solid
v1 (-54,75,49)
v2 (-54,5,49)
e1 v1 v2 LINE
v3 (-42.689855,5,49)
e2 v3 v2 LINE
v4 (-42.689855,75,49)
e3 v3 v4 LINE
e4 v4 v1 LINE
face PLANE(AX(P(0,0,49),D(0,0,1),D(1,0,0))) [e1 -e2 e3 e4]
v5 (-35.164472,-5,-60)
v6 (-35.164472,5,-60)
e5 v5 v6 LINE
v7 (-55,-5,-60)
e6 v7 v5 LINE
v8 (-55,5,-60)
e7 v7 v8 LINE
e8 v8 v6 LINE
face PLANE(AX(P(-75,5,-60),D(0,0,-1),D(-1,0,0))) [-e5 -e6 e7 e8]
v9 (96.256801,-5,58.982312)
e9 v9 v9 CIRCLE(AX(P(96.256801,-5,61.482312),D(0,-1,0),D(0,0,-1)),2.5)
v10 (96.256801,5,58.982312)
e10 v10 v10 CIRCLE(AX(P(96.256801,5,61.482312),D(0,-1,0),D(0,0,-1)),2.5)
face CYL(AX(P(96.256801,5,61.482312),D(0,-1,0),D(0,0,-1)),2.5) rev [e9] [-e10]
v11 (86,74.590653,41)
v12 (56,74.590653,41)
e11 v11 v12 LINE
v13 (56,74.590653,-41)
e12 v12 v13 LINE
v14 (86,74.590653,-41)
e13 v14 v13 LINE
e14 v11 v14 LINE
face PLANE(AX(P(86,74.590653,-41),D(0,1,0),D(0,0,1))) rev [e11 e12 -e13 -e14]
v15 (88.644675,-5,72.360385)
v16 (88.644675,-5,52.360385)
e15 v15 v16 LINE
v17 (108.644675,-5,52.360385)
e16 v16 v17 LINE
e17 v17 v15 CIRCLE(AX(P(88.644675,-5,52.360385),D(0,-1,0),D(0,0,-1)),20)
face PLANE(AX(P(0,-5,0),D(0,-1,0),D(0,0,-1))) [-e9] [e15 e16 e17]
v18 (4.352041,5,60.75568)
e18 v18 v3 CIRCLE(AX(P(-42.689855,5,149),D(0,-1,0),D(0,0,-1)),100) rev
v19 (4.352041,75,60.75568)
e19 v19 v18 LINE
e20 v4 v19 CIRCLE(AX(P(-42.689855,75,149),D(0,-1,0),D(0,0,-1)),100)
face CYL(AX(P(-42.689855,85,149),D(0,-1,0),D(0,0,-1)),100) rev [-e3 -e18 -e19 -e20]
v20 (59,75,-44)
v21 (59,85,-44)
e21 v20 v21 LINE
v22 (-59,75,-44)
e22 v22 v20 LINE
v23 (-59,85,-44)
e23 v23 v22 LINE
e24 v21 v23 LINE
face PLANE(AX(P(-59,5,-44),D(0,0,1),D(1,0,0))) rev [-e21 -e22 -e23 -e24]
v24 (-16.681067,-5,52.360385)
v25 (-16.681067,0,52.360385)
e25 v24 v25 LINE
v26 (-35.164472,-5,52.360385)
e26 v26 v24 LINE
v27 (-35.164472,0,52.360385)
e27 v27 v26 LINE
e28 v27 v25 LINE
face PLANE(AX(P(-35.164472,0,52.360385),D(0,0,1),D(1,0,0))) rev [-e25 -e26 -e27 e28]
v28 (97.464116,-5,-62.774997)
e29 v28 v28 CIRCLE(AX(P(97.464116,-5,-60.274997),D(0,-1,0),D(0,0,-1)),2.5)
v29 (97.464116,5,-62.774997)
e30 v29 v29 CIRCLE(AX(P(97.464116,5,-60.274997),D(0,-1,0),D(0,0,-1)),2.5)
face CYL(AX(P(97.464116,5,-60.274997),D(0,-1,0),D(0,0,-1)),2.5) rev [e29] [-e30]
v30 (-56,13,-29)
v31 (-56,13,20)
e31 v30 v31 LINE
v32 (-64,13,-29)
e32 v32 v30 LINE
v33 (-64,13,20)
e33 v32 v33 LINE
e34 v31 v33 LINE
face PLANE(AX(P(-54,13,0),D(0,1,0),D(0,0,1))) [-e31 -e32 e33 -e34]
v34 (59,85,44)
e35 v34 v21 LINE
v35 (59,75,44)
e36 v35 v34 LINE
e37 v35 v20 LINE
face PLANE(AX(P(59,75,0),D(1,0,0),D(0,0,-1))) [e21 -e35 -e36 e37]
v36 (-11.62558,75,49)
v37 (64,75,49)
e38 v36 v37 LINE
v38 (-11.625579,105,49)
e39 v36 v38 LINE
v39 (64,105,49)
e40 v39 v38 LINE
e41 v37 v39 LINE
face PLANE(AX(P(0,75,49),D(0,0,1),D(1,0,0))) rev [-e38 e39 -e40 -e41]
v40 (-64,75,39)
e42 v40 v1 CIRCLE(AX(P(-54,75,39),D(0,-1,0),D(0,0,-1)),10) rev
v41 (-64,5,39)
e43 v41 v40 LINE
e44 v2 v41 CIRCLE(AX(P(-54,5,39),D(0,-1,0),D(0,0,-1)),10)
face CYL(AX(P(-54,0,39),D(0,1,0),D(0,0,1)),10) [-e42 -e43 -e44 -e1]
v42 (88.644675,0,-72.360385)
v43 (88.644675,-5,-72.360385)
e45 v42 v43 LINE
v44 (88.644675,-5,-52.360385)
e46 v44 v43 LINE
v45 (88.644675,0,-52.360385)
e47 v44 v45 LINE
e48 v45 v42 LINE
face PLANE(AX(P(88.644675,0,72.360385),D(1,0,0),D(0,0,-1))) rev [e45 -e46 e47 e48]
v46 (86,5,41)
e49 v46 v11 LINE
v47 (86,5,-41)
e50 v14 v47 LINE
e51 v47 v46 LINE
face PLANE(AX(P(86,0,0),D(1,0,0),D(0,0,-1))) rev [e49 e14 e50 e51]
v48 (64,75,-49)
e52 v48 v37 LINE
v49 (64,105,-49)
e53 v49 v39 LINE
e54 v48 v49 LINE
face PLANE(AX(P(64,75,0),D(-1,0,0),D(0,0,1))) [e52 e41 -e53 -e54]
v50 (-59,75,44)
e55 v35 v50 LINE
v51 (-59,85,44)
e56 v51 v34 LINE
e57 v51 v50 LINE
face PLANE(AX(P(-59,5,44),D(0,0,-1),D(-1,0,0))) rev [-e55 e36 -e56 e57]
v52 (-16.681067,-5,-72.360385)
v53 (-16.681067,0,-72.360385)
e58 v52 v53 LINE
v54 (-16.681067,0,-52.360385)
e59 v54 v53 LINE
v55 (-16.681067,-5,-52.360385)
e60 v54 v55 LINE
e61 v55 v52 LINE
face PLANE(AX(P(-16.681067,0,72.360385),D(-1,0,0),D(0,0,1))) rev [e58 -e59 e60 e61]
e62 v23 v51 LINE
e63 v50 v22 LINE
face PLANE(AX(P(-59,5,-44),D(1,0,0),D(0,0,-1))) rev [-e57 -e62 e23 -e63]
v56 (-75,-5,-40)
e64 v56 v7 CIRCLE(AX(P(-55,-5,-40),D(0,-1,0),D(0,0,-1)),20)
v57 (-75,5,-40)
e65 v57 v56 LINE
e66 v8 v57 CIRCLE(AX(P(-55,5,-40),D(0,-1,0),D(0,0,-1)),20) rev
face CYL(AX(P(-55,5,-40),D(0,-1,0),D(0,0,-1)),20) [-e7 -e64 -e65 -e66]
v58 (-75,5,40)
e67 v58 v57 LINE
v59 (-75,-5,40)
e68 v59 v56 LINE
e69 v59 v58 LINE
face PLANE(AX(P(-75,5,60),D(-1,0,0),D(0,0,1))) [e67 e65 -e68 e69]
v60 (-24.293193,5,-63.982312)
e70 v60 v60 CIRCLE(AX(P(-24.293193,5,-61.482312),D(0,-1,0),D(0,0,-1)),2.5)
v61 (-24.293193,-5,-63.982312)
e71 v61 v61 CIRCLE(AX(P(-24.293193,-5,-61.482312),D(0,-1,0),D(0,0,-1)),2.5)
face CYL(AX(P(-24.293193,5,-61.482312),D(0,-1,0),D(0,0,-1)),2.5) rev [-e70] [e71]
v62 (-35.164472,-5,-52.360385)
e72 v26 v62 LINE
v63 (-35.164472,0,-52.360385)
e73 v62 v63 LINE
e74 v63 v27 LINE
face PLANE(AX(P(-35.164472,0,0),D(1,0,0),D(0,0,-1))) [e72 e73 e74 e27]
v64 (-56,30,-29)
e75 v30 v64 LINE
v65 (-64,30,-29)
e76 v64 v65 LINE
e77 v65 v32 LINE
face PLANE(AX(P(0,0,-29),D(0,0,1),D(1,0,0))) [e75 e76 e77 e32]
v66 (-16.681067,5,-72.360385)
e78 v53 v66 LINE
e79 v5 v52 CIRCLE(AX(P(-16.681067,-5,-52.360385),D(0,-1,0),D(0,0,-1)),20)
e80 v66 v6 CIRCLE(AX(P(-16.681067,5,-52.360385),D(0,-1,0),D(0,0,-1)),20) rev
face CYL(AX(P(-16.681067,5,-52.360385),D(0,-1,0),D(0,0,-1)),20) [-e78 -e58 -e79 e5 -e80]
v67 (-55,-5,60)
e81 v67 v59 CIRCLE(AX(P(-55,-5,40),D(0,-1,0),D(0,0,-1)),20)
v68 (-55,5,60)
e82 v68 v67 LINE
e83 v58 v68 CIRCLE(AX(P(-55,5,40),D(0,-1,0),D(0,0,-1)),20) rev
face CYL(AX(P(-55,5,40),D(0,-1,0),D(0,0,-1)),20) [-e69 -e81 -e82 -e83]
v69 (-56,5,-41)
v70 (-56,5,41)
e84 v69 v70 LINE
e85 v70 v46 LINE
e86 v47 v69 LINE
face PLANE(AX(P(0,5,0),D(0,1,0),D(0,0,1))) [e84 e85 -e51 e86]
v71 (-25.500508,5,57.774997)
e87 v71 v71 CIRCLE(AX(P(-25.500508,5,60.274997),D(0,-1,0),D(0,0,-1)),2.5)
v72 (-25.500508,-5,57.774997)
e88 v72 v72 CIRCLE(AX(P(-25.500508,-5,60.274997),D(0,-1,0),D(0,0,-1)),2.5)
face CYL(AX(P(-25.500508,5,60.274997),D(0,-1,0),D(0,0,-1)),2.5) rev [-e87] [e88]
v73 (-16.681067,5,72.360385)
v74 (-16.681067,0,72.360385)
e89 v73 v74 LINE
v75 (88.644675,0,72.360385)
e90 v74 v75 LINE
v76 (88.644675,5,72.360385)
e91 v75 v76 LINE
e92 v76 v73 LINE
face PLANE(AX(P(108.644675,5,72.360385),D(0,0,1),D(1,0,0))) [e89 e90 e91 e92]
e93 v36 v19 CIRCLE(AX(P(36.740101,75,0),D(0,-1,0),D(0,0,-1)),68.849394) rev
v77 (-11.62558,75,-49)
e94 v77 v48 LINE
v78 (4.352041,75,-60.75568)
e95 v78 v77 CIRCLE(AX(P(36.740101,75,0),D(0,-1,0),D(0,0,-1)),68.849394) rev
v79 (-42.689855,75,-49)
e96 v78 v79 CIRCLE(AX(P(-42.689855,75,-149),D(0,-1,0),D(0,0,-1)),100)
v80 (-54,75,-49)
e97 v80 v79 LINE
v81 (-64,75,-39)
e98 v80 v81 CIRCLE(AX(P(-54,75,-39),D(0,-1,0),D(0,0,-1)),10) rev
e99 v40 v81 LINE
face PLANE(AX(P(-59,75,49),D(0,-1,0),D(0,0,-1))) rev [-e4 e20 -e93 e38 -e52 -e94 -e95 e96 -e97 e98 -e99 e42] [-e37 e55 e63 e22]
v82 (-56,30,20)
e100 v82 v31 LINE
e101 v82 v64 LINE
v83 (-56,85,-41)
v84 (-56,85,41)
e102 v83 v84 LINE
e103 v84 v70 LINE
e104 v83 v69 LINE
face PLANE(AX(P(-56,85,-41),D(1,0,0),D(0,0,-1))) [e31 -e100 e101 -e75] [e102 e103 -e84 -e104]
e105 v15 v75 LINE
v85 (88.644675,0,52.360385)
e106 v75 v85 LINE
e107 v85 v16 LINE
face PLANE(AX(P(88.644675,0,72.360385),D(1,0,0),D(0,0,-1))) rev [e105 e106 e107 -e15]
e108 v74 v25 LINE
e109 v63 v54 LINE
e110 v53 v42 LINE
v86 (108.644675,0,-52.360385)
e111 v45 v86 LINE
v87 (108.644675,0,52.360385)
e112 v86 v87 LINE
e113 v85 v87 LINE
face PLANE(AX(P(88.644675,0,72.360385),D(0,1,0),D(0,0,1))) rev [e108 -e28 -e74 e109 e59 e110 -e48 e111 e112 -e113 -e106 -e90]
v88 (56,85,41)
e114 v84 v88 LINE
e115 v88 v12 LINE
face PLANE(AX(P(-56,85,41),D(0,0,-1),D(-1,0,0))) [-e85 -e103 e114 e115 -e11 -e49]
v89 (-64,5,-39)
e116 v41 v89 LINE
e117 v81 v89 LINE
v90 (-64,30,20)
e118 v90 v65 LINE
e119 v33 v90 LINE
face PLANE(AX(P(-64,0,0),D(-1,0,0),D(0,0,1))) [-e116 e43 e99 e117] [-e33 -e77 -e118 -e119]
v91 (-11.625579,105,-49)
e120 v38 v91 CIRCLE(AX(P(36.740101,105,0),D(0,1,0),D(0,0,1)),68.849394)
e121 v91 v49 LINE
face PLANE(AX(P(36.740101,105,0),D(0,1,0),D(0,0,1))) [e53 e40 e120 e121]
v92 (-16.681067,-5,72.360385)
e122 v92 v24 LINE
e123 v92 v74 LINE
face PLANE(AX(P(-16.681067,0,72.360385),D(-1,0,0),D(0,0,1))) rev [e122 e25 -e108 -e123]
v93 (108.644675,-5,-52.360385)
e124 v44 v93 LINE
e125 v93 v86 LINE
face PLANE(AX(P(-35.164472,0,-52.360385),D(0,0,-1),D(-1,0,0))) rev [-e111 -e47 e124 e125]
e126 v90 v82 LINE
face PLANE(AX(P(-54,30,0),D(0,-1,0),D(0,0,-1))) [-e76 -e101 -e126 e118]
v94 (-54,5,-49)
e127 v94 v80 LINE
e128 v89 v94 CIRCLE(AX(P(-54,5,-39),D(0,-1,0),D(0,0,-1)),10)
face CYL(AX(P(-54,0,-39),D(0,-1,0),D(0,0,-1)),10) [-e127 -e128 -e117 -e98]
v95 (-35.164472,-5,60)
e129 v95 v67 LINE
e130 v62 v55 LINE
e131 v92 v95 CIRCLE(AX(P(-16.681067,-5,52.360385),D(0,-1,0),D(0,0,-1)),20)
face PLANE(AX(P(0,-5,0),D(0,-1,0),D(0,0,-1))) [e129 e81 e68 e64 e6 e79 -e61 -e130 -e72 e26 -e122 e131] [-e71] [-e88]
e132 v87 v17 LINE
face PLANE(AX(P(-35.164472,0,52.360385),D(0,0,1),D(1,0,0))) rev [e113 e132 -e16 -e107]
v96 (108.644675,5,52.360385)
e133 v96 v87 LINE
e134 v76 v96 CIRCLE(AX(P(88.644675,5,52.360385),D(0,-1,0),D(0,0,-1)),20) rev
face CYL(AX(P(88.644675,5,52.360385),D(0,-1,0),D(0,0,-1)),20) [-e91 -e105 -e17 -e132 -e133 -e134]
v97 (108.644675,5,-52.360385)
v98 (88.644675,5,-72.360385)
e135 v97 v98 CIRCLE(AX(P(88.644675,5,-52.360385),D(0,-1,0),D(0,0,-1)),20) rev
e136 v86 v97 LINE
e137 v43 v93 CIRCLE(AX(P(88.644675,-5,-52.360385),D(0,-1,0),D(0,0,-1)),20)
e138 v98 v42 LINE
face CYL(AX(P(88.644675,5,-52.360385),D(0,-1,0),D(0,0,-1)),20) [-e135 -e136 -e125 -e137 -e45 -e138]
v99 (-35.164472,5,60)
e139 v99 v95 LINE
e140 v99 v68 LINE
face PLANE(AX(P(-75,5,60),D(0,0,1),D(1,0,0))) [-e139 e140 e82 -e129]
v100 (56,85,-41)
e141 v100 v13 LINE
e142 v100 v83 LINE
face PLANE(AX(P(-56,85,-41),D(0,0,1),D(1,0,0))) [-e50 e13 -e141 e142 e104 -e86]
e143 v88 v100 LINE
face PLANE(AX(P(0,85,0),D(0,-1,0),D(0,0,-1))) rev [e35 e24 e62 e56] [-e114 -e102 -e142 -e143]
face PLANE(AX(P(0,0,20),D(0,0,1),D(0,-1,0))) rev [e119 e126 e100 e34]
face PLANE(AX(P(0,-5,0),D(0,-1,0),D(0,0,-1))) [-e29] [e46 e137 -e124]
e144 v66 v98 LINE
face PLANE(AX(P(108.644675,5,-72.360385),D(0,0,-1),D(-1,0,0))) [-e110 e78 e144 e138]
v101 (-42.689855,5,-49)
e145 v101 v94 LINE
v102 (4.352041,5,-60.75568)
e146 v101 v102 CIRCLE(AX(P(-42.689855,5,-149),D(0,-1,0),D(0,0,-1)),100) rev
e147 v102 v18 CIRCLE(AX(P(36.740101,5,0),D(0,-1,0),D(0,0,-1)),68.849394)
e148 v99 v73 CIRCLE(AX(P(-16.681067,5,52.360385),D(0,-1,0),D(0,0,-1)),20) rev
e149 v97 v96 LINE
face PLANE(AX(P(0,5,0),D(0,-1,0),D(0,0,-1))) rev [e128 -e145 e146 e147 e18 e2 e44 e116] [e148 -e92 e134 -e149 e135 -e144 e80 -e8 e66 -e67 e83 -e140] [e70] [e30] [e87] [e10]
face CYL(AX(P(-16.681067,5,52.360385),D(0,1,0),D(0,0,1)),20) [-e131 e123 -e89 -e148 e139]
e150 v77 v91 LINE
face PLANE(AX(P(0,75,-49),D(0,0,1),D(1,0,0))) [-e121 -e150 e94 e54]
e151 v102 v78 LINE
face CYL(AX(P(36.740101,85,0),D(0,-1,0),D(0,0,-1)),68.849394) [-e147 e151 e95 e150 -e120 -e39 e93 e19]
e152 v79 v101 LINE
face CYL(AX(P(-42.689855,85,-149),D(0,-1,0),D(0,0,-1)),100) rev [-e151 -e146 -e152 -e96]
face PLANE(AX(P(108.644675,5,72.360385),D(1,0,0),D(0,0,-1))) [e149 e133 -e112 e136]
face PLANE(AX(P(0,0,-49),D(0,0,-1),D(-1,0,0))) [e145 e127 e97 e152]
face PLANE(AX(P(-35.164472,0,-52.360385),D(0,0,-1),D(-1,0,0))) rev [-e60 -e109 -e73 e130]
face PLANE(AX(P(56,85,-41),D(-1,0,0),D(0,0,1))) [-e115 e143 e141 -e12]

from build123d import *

# Parameters (mm, degrees)
CROQUIS2_W               = 118
CROQUIS2_H               = 88
SALIENTE_EXTRUIR1_DEPTH  = 5
CROQUIS3_W               = 118
CROQUIS3_H               = 88
CROQUIS3_W_2             = 112
CROQUIS3_H_2             = 82
SALIENTE_EXTRUIR2_DEPTH  = 80
CROQUIS4_W               = 150
CROQUIS4_H               = 120
SALIENTE_EXTRUIR3_DEPTH  = 5
CROQUIS7_W               = 60
CROQUIS7_H               = 17
CORTAR_EXTRUIR3_DEPTH    = 5
CROQUIS8_W               = 3
CROQUIS8_H               = 17
SALIENTE_EXTRUIR4_DEPTH  = 4
CROQUIS9_W               = 3
CROQUIS9_H               = 17
SALIENTE_EXTRUIR5_DEPTH  = 7
CROQUIS10_W              = 118
CROQUIS10_H              = 5
SALIENTE_EXTRUIR6_DEPTH  = 5
CROQUIS11_W              = 93
CROQUIS11_H              = 5
SALIENTE_EXTRUIR7_DEPTH  = 5
CROQUIS12_W              = 123
CROQUIS12_H              = 5
SALIENTE_EXTRUIR8_DEPTH  = 5
CROQUIS13_W              = 98
CROQUIS13_H              = 5
SALIENTE_EXTRUIR9_DEPTH  = 5
SALIENTE_EXTRUIR11_DEPTH = 85
CORTAR_EXTRUIR4_DEPTH    = 10
SALIENTE_EXTRUIR12_DEPTH = 70
CROQUIS21_W              = 49
CROQUIS21_H              = 17
CORTAR_EXTRUIR5_DEPTH    = 70
REDONDEO4_R              = 10
REDONDEO5_R              = 100
SALIENTE_EXTRUIR13_DEPTH = 20
CROQUIS23_W              = 143.80914693
CROQUIS23_H              = 144.72077086
CROQUIS23_R              = 24.004265162
SALIENTE_EXTRUIR14_DEPTH = 5
SALIENTE_EXTRUIR15_DEPTH = 5
REDONDEO9_R              = 20
CROQUIS27_W              = 105.325741151
CROQUIS27_H              = 5
CORTAR_EXTRUIR7_DEPTH    = 210.21942266
CROQUIS28_W              = 104.72077086
CROQUIS28_H              = 5
CORTAR_EXTRUIR8_DEPTH    = 143.809145
CROQUIS29_R              = 2.5
CORTAR_EXTRUIR9_DEPTH    = 10
REDONDEO10_R             = 20
CROQUIS30_W              = 82
CROQUIS30_H              = 69.590652645
CORTAR_EXTRUIR10_DEPTH   = 30


with BuildPart() as part:
    # Croquis2 → Saliente-Extruir1 (new body)
    with BuildSketch(Plane(origin=(0, 0, 0), x_dir=(1, 0, 0), z_dir=(0, 1, 0))):
        Rectangle(CROQUIS2_W, CROQUIS2_H)
    extrude(amount=SALIENTE_EXTRUIR1_DEPTH)

    # Croquis3 → Saliente-Extruir2 (add)
    with BuildSketch(Plane(origin=(0, 5, 0), x_dir=(1, 0, 0), z_dir=(0, 1, 0))):
        Rectangle(CROQUIS3_W, CROQUIS3_H)
        Rectangle(CROQUIS3_W_2, CROQUIS3_H_2, mode=Mode.SUBTRACT)
    extrude(amount=SALIENTE_EXTRUIR2_DEPTH)

    # Croquis4 → Saliente-Extruir3 (add)
    with BuildSketch(Plane.XZ):
        Rectangle(CROQUIS4_W, CROQUIS4_H)
    extrude(amount=-SALIENTE_EXTRUIR3_DEPTH)

    # Croquis7 → Cortar-Extruir3 (cut)
    with BuildSketch(Plane.ZY.offset(59)):
        with Locations((-3, 21.5)):
            Rectangle(CROQUIS7_W, CROQUIS7_H)
    extrude(amount=-CORTAR_EXTRUIR3_DEPTH, mode=Mode.SUBTRACT)

    # Croquis8 → Saliente-Extruir4 (add)
    with BuildSketch(Plane.XY.offset(-33)):
        with Locations((-57.5, 21.5)):
            Rectangle(CROQUIS8_W, CROQUIS8_H)
    extrude(amount=SALIENTE_EXTRUIR4_DEPTH)

    # Croquis9 → Saliente-Extruir5 (add)
    with BuildSketch(Plane(origin=(0, 0, 27), x_dir=(-1, 0, 0), z_dir=(0, 0, -1))):
        with Locations((57.5, 21.5)):
            Rectangle(CROQUIS9_W, CROQUIS9_H)
    extrude(amount=SALIENTE_EXTRUIR5_DEPTH)

    # Croquis10 → Saliente-Extruir6 (add)
    with BuildSketch(Plane.XY.offset(44)):
        with Locations((0, 72.5)):
            Rectangle(CROQUIS10_W, CROQUIS10_H)
    extrude(amount=SALIENTE_EXTRUIR6_DEPTH)

    # Croquis11 → Saliente-Extruir7 (add)
    with BuildSketch(Plane(origin=(59, 0, 0), x_dir=(0, 0, -1), z_dir=(1, 0, 0))):
        with Locations((-2.5, 72.5)):
            Rectangle(CROQUIS11_W, CROQUIS11_H)
    extrude(amount=SALIENTE_EXTRUIR7_DEPTH)

    # Croquis12 → Saliente-Extruir8 (add)
    with BuildSketch(Plane(origin=(0, 0, -44), x_dir=(-1, 0, 0), z_dir=(0, 0, -1))):
        with Locations((-2.5, 72.5)):
            Rectangle(CROQUIS12_W, CROQUIS12_H)
    extrude(amount=SALIENTE_EXTRUIR8_DEPTH)

    # Croquis13 → Saliente-Extruir9 (add)
    with BuildSketch(Plane.ZY.offset(59)):
        with Locations((0, 72.5)):
            Rectangle(CROQUIS13_W, CROQUIS13_H)
    extrude(amount=SALIENTE_EXTRUIR9_DEPTH)

    # Croquis16 → Saliente-Extruir11 (add)
    with BuildSketch(Plane(origin=(0, 0, 0), x_dir=(-1, 0, 0), z_dir=(0, -1, 0))):
        with BuildLine():
            Line((-59, 44), (16.214965512, 44))
            ThreePointArc((16.214965512, 44), (-105.589495195, 0), (16.214965512, -44))
            Line((16.214965512, -44), (-59, -44))
            Line((-59, -44), (-59, 44))
        make_face()
    extrude(amount=-SALIENTE_EXTRUIR11_DEPTH)

    # Croquis18 → Cortar-Extruir4 (cut)
    with BuildSketch(Plane(origin=(0, 85, 0), x_dir=(1, 0, 0), z_dir=(0, 1, 0))):
        Polygon((-64, 49), (-8.415102712, 49), (63.361111922, 49), (64, 49), (64, 44), (64, -44), (64, -49), (63.361111922, -49), (-8.415102712, -49), (-64, -49), (-64, -44), (-16.214965512, -44), (59, -44), (59, 44), (-16.214965512, 44), (-64, 44), align=None)
    extrude(amount=-CORTAR_EXTRUIR4_DEPTH, mode=Mode.SUBTRACT)

    # Croquis19 → Saliente-Extruir12 (add)
    with BuildSketch(Plane(origin=(0, 5, 0), x_dir=(1, 0, 0), z_dir=(0, 1, 0))):
        Polygon((-16.214965512, -44), (-59, -44), (-59, 44), (-16.214965512, 44), (3.50341587, 44), (3.50341587, 49), (-8.415102712, 49), (-64, 49), (-64, -49), (-8.415102712, -49), (4.243498443, -49), (4.243498443, -44), align=None)
    extrude(amount=SALIENTE_EXTRUIR12_DEPTH)

    # Croquis21 → Cortar-Extruir5 (cut)
    with BuildSketch(Plane(origin=(-56, 0, 0), x_dir=(0, 0, -1), z_dir=(1, 0, 0))):
        with Locations((4.5, 21.5)):
            Rectangle(CROQUIS21_W, CROQUIS21_H)
    extrude(amount=-CORTAR_EXTRUIR5_DEPTH, mode=Mode.SUBTRACT)

    # Redondeo4
    redondeo4_edges = [part.edges().sort_by_distance(p)[0] for p in [
        (-64, 40, -49),
        (-64, 40, 49),
    ]]
    fillet(redondeo4_edges, radius=REDONDEO4_R)

    # Redondeo5
    redondeo5_edges = [part.edges().sort_by_distance(p)[0] for p in [
        (-11.625579702, 40, -49),
        (-11.625579702, 40, 49),
    ]]
    fillet(redondeo5_edges, radius=REDONDEO5_R)

    # Croquis22 → Saliente-Extruir13 (add)
    with BuildSketch(Plane(origin=(0, 85, 0), x_dir=(1, 0, 0), z_dir=(0, 1, 0))):
        with BuildLine():
            Line((64, -49), (4.315842741, -49))
            Line((4.315842741, -49), (-11.625579493, -49))
            ThreePointArc((-11.625579493, -49), (105.589495048, 0), (-11.625579493, 49))
            Line((-11.625579493, 49), (4.315842741, 49))
            Line((4.315842741, 49), (64, 49))
            Line((64, 49), (64, -49))
        make_face()
    extrude(amount=SALIENTE_EXTRUIR13_DEPTH)

    # Croquis23 → Saliente-Extruir14 (add)
    with BuildSketch(Plane(origin=(0, 0, 0), x_dir=(-1, 0, 0), z_dir=(0, -1, 0))):
        with Locations((-36.740101048, 0)):
            Rectangle(CROQUIS23_W, CROQUIS23_H)
        with Locations((-36.740101048, 0)):
            Circle(CROQUIS23_R, mode=Mode.SUBTRACT)
    extrude(amount=-SALIENTE_EXTRUIR14_DEPTH)

    # Croquis25 → Saliente-Extruir15 (add)
    with BuildSketch(Plane(origin=(0, 0, 0), x_dir=(-1, 0, 0), z_dir=(0, -1, 0))):
        Polygon((35.164472417, -60), (35.164472417, -72.36038543), (-108.644674513, -72.36038543), (-108.644674513, 72.36038543), (35.164472417, 72.36038543), (35.164472417, 60), (75, 60), (75, -60), align=None)
    extrude(amount=SALIENTE_EXTRUIR15_DEPTH)

    # Redondeo9
    # the kernel refuses this fillet: 20 mm, written as the material it takes off along each edge
    with BuildSketch(Plane(origin=(108.644674513, -55, -72.36038543), x_dir=(-1, 0, 0), z_dir=(0, 1, 0)), Plane(origin=(108.644674513, -55, 72.36038543), x_dir=(0, 0, -1), z_dir=(0, 1, 0))) as redondeo9_piece_1:
        with BuildLine():
            CenterArc((REDONDEO9_R, REDONDEO9_R), REDONDEO9_R, 180, 90)
            Line((0, REDONDEO9_R), (-REDONDEO9_R * 0.02, REDONDEO9_R))
            Line((-REDONDEO9_R * 0.02, REDONDEO9_R), (-REDONDEO9_R * 0.02, -REDONDEO9_R * 0.02))
            Line((-REDONDEO9_R * 0.02, -REDONDEO9_R * 0.02), (REDONDEO9_R, -REDONDEO9_R * 0.02))
            Line((REDONDEO9_R, -REDONDEO9_R * 0.02), (REDONDEO9_R, 0))
        make_face()
    extrude(amount=110, mode=Mode.SUBTRACT)
    with BuildSketch(Plane(origin=(-35.164472417, -51.20851445, 72.36038543), x_dir=(1, 0, 0), z_dir=(0, 1, 0))) as redondeo9_piece_2:
        with BuildLine():
            CenterArc((18.48340578, 20), REDONDEO9_R, 202.456427621, 67.543572379)
            Line((0, 12.36038543), (-0.369668116, 12.207593139))
            ThreePointArc((-0.369668116, 12.207593139), (-0.4, 6.180192715), (-0.4, 0))
            Line((-0.4, 0), (0, -0.4))
            Line((0, -0.4), (18.48340578, -0.4))
            Line((18.48340578, -0.4), (18.48340578, 0))
        make_face()
    extrude(amount=102.417028899, mode=Mode.SUBTRACT)
    with BuildSketch(Plane(origin=(-35.164472417, -51.20851445, -72.36038543), x_dir=(0, 0, 1), z_dir=(0, 1, 0))) as redondeo9_piece_3:
        with BuildLine():
            CenterArc((20, 18.48340578), REDONDEO9_R, 180, 67.543572379)
            Line((0, 18.48340578), (-0.4, 18.48340578))
            Line((-0.4, 18.48340578), (-0.4, 0))
            Line((-0.4, 0), (0, -0.4))
            ThreePointArc((0, -0.4), (6.180192715, -0.4), (12.207593139, -0.369668116))
            Line((12.207593139, -0.369668116), (12.36038543, 0))
        make_face()
    extrude(amount=102.417028899, mode=Mode.SUBTRACT)

    # Croquis27 → Cortar-Extruir7 (cut, through all)
    with BuildSketch(Plane(origin=(0, 0, -72.36038543), x_dir=(-1, 0, 0), z_dir=(0, 0, -1))):
        with Locations((-35.981803938, -2.5)):
            Rectangle(CROQUIS27_W, CROQUIS27_H)
    extrude(amount=-CORTAR_EXTRUIR7_DEPTH, mode=Mode.SUBTRACT)

    # Croquis28 → Cortar-Extruir8 (cut)
    with BuildSketch(Plane(origin=(108.644674513, 0, 0), x_dir=(0, 0, -1), z_dir=(1, 0, 0))):
        with Locations((0, -2.5)):
            Rectangle(CROQUIS28_W, CROQUIS28_H)
    extrude(amount=-CORTAR_EXTRUIR8_DEPTH, mode=Mode.SUBTRACT)

    # Croquis29 → Cortar-Extruir9 (cut)
    with BuildSketch(Plane(origin=(0, -5, 0), x_dir=(-1, 0, 0), z_dir=(0, -1, 0))):
        with Locations(Location((-96.256800969, -61.48231173, 0), (0, 0, 90))):
            Circle(CROQUIS29_R)
        with Locations(Location((-97.464115668, 60.274997031, 0), (0, 0, 90))):
            Circle(CROQUIS29_R)
        with Locations(Location((24.293193094, 61.48231173, 0), (0, 0, 90))):
            Circle(CROQUIS29_R)
        with Locations(Location((25.500507793, -60.274997031, 0), (0, 0, 90))):
            Circle(CROQUIS29_R)
    extrude(amount=-CORTAR_EXTRUIR9_DEPTH, mode=Mode.SUBTRACT)

    # Redondeo10
    redondeo10_edges = [part.edges().sort_by_distance(p)[0] for p in [
        (-75, 0, -60),
        (-75, 0, 60),
    ]]
    fillet(redondeo10_edges, radius=REDONDEO10_R)

    # Croquis30 → Cortar-Extruir10 (cut)
    with BuildSketch(Plane.ZY.offset(-56)):
        with Locations((0, 39.795326323)):
            Rectangle(CROQUIS30_W, CROQUIS30_H)
    extrude(amount=-CORTAR_EXTRUIR10_DEPTH, mode=Mode.SUBTRACT)


solid = part.part
